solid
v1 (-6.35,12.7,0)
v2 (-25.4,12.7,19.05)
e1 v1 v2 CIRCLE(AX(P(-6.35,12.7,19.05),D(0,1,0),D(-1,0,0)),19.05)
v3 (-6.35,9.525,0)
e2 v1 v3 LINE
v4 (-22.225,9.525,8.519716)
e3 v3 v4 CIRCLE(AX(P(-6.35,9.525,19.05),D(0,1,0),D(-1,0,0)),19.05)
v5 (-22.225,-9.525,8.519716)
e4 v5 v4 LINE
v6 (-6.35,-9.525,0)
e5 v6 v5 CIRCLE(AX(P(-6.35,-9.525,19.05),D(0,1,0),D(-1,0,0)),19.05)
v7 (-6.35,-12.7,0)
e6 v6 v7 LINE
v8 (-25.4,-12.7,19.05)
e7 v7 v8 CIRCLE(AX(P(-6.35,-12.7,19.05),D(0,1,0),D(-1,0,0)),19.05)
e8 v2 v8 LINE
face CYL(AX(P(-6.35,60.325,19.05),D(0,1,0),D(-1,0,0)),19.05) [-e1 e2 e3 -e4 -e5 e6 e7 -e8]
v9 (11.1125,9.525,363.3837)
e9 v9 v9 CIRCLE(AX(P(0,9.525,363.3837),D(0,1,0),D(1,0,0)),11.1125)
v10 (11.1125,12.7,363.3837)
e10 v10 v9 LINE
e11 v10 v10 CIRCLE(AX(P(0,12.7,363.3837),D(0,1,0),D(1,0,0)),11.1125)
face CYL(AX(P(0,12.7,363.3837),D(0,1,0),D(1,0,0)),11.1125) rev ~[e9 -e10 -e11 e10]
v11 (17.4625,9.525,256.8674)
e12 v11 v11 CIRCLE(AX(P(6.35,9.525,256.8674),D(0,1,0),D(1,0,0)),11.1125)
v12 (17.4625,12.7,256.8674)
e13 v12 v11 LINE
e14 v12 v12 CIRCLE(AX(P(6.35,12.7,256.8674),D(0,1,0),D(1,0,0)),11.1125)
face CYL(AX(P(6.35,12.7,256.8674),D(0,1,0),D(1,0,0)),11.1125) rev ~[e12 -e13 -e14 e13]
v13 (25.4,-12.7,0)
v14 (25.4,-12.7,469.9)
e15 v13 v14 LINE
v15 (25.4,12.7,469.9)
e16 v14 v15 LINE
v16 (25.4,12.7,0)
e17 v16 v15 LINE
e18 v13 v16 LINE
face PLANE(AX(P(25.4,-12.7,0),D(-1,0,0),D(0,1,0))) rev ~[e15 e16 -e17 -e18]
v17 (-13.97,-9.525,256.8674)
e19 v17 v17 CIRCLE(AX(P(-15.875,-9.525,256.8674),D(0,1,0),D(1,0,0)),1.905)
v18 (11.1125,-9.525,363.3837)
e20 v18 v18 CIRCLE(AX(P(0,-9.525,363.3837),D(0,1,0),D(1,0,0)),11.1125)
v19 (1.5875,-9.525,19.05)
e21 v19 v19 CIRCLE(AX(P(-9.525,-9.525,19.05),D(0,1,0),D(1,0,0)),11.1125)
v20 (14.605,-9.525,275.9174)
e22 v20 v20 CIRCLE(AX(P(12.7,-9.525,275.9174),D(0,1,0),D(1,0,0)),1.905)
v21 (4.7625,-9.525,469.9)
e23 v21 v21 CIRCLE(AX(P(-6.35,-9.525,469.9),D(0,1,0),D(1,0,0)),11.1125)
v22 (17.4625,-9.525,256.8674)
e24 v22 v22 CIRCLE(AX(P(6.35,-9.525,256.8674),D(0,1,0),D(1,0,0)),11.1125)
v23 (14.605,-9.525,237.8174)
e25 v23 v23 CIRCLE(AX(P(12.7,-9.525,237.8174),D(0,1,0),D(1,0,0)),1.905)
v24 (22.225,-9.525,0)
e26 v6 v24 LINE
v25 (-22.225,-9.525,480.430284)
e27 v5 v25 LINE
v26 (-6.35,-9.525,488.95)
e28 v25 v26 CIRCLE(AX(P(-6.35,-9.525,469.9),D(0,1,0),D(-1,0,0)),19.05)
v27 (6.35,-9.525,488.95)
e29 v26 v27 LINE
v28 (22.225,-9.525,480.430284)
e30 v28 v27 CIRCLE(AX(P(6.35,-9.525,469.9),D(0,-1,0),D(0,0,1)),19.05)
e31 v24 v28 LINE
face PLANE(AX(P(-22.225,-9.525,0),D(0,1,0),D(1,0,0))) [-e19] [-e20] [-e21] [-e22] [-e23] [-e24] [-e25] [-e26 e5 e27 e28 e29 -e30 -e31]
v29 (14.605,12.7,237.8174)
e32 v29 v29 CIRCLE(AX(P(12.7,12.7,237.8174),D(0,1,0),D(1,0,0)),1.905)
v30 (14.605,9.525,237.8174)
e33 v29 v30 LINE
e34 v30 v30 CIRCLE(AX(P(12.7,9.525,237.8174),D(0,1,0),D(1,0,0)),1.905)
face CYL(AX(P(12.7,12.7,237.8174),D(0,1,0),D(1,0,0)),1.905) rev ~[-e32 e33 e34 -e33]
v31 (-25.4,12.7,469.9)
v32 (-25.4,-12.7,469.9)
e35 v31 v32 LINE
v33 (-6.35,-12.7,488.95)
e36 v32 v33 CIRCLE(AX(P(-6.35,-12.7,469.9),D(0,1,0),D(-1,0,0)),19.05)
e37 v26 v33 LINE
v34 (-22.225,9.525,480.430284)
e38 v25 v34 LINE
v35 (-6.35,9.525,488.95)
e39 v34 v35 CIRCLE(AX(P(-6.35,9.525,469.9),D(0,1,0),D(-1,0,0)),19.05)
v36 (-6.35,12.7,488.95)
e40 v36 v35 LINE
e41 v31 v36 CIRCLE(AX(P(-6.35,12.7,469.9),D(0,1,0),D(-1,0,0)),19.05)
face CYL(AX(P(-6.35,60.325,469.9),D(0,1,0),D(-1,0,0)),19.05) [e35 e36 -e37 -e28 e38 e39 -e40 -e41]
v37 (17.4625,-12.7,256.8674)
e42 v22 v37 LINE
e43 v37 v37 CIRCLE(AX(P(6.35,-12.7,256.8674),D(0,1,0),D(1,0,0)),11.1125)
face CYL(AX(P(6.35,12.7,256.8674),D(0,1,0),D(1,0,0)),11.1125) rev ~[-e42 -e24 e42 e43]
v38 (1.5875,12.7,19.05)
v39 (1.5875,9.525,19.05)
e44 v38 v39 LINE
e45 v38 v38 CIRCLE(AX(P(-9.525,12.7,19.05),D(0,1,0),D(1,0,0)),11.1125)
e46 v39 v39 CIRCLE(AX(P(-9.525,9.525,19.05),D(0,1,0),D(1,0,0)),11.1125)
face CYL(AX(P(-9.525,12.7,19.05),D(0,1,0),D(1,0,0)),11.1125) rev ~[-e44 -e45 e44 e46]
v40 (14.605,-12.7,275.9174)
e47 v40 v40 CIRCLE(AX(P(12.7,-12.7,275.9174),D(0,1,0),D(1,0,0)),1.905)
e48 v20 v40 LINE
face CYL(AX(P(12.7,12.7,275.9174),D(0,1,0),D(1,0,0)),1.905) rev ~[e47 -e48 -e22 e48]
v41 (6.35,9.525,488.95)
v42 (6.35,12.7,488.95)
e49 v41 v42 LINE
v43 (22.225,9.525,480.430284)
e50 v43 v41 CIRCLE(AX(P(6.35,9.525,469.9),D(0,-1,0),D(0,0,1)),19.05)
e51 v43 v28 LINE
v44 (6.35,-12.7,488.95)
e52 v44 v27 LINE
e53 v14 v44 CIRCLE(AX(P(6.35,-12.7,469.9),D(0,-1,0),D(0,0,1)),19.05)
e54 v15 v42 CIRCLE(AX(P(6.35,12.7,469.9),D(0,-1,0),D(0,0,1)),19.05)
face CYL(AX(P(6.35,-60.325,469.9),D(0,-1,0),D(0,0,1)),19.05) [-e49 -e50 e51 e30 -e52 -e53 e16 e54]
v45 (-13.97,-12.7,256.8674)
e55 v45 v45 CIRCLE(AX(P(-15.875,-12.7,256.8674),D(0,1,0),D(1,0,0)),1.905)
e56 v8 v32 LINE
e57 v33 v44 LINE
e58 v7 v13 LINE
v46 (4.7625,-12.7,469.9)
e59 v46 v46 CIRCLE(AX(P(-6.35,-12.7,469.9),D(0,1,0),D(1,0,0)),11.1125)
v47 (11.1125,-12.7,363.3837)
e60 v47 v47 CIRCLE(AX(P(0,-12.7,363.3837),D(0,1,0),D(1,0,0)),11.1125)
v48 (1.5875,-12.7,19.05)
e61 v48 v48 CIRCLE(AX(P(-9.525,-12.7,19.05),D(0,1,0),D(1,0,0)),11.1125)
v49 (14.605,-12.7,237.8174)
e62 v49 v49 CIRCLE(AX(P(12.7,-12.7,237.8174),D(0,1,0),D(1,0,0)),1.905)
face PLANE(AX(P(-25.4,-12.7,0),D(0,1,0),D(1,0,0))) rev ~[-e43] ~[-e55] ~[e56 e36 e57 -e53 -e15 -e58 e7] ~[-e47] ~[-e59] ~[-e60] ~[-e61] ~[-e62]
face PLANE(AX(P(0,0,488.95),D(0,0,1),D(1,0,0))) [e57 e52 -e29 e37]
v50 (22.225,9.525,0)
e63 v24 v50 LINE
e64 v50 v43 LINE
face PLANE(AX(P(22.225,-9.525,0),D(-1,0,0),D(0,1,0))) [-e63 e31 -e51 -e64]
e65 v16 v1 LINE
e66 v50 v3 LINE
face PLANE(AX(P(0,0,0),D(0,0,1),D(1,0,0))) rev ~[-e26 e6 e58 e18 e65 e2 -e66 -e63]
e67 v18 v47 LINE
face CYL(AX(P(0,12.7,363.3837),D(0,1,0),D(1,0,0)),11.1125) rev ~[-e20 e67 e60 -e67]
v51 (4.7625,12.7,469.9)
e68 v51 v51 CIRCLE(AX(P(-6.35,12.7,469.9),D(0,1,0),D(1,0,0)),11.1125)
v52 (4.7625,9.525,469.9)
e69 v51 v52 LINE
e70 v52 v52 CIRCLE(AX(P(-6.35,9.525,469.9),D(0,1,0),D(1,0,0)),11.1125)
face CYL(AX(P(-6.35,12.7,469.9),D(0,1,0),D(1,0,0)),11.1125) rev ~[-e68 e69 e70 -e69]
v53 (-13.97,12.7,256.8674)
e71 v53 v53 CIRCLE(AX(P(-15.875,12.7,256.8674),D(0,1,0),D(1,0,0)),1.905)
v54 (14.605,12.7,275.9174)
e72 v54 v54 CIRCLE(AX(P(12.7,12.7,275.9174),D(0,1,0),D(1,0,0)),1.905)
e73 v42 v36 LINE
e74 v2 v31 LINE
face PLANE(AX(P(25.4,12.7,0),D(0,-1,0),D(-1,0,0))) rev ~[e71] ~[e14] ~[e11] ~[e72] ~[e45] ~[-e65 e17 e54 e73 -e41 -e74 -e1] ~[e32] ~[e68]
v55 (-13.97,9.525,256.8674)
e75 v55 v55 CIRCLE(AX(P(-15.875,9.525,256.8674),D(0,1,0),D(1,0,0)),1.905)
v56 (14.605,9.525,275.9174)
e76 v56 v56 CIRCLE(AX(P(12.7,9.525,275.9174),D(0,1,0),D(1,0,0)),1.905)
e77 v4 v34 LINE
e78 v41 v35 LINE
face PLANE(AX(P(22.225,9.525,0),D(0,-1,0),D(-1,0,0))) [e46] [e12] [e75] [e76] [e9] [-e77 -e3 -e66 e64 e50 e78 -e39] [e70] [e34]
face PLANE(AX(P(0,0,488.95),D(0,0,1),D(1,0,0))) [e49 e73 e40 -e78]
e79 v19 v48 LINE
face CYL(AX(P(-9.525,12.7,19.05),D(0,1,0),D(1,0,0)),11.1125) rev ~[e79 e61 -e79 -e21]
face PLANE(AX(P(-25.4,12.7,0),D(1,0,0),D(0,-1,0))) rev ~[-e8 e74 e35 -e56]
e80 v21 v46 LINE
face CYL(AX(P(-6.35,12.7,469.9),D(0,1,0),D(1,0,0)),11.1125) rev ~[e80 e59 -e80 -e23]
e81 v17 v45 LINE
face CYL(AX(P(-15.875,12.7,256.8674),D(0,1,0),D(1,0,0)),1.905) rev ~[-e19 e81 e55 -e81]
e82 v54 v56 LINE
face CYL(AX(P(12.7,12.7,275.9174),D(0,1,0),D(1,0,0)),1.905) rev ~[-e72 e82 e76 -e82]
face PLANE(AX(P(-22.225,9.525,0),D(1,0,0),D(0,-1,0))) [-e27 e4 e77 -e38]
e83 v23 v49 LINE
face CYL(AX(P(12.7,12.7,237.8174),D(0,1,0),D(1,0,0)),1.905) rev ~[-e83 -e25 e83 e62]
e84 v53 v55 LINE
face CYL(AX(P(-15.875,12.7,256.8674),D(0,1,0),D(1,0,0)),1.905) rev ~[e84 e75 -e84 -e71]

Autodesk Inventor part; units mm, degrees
ref_plane "YZ Plane" through (0, 0, 0) normal (1, 0, 0) x (0, 1, 0)
ref_plane "XZ Plane" through (0, 0, 0) normal (0, 1, 0) x (-1, 0, 0)
ref_plane "XY Plane" through (0, 0, 0) normal (0, 0, 1) x (1, 0, 0)
sketch "Sketch1" plane through (0, 0, 0) normal (0, 0, 1) x (1, 0, 0)
  line L0 (-25.4, -12.7) -> (25.4, -12.7)
  line L1 (25.4, -12.7) -> (25.4, 12.7)
  line L2 (25.4, 12.7) -> (-25.4, 12.7)
  line L3 (-25.4, 12.7) -> (-25.4, -12.7)
  line L4 (-25.4, -12.7) -> (25.4, 12.7) construction
  line L5 (25.4, -12.7) -> (-25.4, 12.7) construction
  line L6 (-22.225, -9.525) -> (22.225, -9.525)
  line L7 (22.225, -9.525) -> (22.225, 9.525)
  line L8 (22.225, 9.525) -> (-22.225, 9.525)
  line L9 (-22.225, 9.525) -> (-22.225, -9.525)
  line L10 (-22.225, -9.525) -> (22.225, 9.525) construction
  line L11 (22.225, -9.525) -> (-22.225, 9.525) construction
  line L12 (0, 9.525) -> (0, 12.7) construction
  line L13 (22.225, 0) -> (25.4, 0) construction
  point P0 (0, 0)
  dimension "d0" = 25.4
  dimension "d1" = 50.8
  dimension "d2" = 3.175
extrude "Extrusion1" add sketch "Sketch1" along normal blind 488.95
sketch "Sketch2" plane through (-25.4, 12.7, 0) normal (0, 1, 0) x (1, 0, 0)
  circle A0 centre (19.05, -469.9) radius 11.1125
  circle A1 centre (31.75, -256.8674) radius 11.1125
  circle A2 centre (25.4, -363.3837) radius 11.1125
  circle A3 centre (15.875, -19.05) radius 11.1125
  line L0 (0, 0) -> (0, -488.95) construction
  line L1 (3.175, 0) -> (3.175, -488.95) construction
  line L2 (50.8, 0) -> (50.8, -488.95) construction
  line L3 (15.875, -19.05) -> (24.1367, -26.4818) construction
  line L4 (19.05, -469.9) -> (31.75, -256.8674) construction
  line L5 (50.8, -488.95) -> (0, -488.95) projected
  line L6 (47.625, 0) -> (47.625, -488.95) construction
  circle A4 centre (38.1, -237.8174) radius 1.905
  circle A5 centre (38.1, -275.9174) radius 1.905
  circle A6 centre (9.525, -256.8674) radius 1.905
  line L7 (38.1, -237.8174) -> (38.1, -275.9174) construction
  line L8 (9.525, -256.8674) -> (47.625, -256.8674) construction
  circle A7 centre (31.75, -256.8674) radius 14.2875 construction
  circle A8 centre (19.05, -469.9) radius 14.2875 construction
  circle A9 centre (31.75, -256.8674) radius 14.2875 construction
  circle A10 centre (15.875, -19.05) radius 14.2875 construction
  point P0 (25.4, -363.3837)
  point P1 (38.1, -256.8674)
  dimension "d10" = 22.225
  dimension "d5" = 22.225
  dimension "d16" = 19.05
  dimension "d17" = 19.05
  dimension "d20" = 19.05
  dimension "d21" = 15.875
  dimension "d23" = 19.05
  dimension "d24" = 38.1
  dimension "d27" = 28.575
  dimension "d28" = 3.81
  dimension "d29" = 22.225
  dimension "d31" = 106.7054
  dimension "d32" = 28.575
  dimension "d34" = 6.35
extrude "Extrusion2" cut sketch "Sketch2" against normal through all
fillet "Fillet1" radius 19.05 3 edges at (-25.4, 0, 0) (-25.4, 0, 488.95) (25.4, 0, 488.95)
properties part number "arm" material "Aluminum 6061"
